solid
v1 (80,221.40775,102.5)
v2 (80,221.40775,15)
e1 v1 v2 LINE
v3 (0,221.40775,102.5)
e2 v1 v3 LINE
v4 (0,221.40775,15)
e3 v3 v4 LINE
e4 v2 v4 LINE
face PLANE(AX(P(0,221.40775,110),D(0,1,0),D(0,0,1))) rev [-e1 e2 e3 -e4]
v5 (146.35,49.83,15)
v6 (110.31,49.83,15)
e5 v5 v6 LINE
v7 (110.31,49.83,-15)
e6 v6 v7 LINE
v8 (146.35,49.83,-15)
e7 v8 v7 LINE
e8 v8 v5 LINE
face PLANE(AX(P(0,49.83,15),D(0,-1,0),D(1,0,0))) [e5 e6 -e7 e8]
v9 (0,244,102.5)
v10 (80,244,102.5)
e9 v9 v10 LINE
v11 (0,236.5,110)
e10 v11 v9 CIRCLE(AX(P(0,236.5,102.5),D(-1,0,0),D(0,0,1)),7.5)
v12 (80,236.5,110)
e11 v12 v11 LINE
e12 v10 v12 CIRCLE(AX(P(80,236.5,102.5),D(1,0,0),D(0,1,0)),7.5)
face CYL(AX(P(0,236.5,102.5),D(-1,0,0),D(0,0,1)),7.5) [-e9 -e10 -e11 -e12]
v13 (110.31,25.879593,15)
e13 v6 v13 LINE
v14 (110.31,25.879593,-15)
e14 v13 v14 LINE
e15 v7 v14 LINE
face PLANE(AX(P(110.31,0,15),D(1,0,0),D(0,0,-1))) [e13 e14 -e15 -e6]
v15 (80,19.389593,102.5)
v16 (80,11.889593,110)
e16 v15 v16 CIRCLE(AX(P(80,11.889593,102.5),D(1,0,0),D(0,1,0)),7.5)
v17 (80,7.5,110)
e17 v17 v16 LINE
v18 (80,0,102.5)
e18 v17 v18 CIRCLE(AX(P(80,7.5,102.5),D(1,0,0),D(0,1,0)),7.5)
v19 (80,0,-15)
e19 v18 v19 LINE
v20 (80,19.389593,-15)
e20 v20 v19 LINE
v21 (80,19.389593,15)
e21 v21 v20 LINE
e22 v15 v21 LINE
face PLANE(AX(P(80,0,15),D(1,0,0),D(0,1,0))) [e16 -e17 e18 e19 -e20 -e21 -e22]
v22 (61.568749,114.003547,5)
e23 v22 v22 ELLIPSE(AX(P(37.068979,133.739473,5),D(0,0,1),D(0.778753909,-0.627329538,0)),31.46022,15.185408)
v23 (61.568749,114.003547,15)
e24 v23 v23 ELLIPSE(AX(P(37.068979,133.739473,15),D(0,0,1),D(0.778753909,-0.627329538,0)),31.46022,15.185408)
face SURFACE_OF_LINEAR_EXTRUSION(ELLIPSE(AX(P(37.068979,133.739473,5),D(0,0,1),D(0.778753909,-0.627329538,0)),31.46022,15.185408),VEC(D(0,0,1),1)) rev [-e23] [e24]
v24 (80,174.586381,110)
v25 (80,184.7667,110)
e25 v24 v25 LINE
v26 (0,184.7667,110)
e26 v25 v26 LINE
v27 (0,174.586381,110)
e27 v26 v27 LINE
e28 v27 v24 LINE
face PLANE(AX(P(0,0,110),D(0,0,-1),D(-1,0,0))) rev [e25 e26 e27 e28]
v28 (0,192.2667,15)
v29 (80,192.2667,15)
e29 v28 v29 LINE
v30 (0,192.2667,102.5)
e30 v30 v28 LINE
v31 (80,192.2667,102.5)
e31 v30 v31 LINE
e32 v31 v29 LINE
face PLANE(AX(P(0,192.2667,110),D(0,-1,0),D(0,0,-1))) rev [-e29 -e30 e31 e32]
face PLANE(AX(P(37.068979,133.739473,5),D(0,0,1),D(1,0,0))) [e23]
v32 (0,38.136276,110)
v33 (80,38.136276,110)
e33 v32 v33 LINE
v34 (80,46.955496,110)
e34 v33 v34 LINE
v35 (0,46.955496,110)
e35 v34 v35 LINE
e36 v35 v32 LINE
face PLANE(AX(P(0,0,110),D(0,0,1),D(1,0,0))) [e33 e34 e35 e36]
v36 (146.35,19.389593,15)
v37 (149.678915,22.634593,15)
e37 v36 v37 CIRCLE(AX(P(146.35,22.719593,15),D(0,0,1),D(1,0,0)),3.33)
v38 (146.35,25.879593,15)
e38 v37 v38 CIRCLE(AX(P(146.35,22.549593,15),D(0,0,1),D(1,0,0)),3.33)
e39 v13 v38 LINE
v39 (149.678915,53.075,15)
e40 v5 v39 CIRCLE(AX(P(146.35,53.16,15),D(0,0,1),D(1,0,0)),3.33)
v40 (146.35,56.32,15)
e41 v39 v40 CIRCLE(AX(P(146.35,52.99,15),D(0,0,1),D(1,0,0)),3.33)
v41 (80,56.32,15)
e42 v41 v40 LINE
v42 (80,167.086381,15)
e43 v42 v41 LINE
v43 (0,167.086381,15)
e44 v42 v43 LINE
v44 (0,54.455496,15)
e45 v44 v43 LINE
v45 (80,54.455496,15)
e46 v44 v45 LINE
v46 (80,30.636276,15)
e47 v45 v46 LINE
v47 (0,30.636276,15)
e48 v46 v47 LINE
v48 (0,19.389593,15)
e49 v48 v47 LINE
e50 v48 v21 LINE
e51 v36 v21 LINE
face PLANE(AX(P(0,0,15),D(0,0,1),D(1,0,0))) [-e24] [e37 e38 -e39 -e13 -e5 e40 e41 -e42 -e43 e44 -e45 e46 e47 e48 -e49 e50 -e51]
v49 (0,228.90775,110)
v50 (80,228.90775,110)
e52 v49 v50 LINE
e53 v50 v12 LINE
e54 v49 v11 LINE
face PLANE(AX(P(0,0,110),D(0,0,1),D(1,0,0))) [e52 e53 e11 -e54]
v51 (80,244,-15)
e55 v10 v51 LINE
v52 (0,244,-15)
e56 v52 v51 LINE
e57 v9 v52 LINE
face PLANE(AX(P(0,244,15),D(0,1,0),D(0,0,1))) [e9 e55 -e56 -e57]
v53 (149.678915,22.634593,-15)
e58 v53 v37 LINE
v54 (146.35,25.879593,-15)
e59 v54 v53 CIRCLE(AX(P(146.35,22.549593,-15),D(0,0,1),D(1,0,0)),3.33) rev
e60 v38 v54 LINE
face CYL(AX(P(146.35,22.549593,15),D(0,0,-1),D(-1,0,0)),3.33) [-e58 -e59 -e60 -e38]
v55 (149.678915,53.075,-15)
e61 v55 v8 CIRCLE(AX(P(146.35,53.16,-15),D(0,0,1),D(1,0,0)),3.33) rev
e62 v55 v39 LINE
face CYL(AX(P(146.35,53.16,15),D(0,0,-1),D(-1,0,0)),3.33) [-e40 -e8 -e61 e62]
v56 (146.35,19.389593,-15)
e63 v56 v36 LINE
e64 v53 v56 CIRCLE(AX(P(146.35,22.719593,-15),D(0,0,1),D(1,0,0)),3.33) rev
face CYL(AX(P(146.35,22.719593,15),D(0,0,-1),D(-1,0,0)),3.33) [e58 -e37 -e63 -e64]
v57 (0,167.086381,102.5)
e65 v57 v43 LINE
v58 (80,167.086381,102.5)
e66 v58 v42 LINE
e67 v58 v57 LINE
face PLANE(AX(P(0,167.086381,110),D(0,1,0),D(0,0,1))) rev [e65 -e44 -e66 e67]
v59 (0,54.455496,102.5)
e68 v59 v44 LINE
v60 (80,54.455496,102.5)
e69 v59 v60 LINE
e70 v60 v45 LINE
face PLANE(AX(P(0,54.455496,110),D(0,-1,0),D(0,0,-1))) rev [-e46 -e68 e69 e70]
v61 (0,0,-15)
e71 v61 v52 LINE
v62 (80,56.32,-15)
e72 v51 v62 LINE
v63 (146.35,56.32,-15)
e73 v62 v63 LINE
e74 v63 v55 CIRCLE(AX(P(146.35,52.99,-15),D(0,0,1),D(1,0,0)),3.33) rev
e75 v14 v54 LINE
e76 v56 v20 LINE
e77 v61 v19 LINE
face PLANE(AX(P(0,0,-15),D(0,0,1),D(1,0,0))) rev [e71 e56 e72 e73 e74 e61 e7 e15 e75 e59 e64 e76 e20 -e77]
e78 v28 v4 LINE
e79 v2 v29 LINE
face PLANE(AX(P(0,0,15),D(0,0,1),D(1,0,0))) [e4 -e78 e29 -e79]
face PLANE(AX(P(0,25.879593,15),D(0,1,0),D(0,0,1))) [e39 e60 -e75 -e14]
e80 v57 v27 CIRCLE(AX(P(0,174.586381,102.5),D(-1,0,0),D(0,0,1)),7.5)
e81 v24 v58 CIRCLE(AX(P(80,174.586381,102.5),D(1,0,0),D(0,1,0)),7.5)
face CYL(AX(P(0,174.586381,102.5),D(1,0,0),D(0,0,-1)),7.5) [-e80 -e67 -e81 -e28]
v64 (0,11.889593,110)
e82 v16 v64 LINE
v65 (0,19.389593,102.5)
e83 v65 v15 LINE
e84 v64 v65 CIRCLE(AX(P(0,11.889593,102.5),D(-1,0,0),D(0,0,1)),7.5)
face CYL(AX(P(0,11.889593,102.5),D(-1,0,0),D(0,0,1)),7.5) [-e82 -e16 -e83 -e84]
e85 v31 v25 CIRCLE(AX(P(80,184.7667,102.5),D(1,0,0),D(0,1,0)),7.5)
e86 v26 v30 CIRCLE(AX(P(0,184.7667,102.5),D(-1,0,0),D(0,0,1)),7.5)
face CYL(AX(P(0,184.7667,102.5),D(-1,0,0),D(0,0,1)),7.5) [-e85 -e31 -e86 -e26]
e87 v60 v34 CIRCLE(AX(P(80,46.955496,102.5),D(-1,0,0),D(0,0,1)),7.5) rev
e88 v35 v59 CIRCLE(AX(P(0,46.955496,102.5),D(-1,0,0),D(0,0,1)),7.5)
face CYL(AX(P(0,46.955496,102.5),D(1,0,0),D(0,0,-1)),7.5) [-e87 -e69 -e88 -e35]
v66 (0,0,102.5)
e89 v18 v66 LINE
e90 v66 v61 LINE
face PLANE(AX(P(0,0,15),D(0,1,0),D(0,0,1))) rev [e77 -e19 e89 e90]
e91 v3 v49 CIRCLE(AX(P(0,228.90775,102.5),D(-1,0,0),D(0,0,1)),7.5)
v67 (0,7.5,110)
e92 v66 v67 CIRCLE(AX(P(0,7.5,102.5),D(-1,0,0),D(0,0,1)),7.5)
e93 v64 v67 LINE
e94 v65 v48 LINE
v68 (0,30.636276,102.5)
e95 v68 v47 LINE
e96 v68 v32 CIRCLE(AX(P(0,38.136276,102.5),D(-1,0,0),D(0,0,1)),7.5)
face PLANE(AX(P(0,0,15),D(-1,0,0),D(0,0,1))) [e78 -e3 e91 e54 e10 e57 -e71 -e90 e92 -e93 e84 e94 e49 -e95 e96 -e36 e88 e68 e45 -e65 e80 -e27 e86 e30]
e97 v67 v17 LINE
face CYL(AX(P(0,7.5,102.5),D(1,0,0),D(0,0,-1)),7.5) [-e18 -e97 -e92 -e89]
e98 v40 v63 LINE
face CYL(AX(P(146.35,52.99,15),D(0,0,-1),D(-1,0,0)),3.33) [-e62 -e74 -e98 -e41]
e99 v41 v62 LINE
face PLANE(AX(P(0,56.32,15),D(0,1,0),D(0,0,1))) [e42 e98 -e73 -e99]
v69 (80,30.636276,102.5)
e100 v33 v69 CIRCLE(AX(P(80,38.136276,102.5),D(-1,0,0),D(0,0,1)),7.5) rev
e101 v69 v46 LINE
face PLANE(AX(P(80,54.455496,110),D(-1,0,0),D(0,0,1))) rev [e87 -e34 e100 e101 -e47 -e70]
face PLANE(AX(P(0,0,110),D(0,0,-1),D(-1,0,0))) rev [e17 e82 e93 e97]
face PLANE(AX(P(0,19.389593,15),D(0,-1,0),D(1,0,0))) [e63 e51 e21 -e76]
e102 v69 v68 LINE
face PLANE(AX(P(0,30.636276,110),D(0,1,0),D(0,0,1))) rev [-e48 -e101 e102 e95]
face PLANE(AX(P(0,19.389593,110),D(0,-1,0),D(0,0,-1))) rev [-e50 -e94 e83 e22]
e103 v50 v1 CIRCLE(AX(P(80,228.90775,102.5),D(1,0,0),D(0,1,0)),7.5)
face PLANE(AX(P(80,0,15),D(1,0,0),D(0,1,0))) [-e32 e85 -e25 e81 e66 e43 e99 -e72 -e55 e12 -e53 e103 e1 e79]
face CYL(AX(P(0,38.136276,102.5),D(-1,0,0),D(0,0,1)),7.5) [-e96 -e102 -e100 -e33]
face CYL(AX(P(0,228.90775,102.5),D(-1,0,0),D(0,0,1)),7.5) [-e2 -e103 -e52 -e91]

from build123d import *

# Parameters (mm, degrees)
BOSS_EXTRUDE2_DEPTH = 15
FILLET1_R           = 3.33
SKETCH3_W           = 80
SKETCH3_H           = 22.592249713
BOSS_EXTRUDE3_DEPTH = 110
SKETCH4_W           = 80
SKETCH4_H           = 25.180318724
SKETCH4_H_2         = 19.389592809
SKETCH4_H_3         = 23.819220414
BOSS_EXTRUDE4_DEPTH = 110
FILLET2_R           = 7.5
SKETCH5_RX          = 31.460220339
SKETCH5_RY          = 15.185408179
CUT_EXTRUDE1_DEPTH  = 10


with BuildPart() as part:
    # Sketch2 → Boss-Extrude2 (new, symmetric)
    with BuildSketch(Plane.XY):
        Polygon((80, 244), (80, 56.32), (80, 0), (0, 0), (0, 244), align=None)
        Polygon((149.68, 56.32), (80, 56.32), (80, 19.389592809), (149.68, 19.389592809), (149.68, 25.879592809), (110.31, 25.879592809), (110.31, 49.83), (149.68, 49.83), align=None)
    extrude(amount=BOSS_EXTRUDE2_DEPTH, both=True)

    # Fillet1
    # the kernel refuses this fillet: 3.33 mm, written as the material it takes off along each edge
    with BuildSketch(Plane(origin=(149.68, 19.389592809, -23.325), x_dir=(-1, 0, 0), z_dir=(0, 0, 1)), Plane(origin=(149.68, 25.879592809, -23.325), x_dir=(0, -1, 0), z_dir=(0, 0, 1)), Plane(origin=(149.68, 49.83, 23.325), x_dir=(0, 1, 0), z_dir=(0, 0, -1)), Plane(origin=(149.68, 56.32, 23.325), x_dir=(-1, 0, 0), z_dir=(0, 0, -1))) as fillet1_piece_1:
        with BuildLine():
            CenterArc((FILLET1_R, -FILLET1_R), FILLET1_R, 90, 90)
            Line((0, -FILLET1_R), (0, 0))
            Line((0, 0), (FILLET1_R, 0))
        make_face()
    extrude(amount=46.65, mode=Mode.SUBTRACT)

    # Sketch3 → Boss-Extrude3 (add)
    with BuildSketch(Plane.XY):
        with Locations((40, 232.703875144)):
            Rectangle(SKETCH3_W, SKETCH3_H)
    extrude(amount=BOSS_EXTRUDE3_DEPTH)

    # Sketch4 → Boss-Extrude4 (add)
    with BuildSketch(Plane.XY):
        with Locations((40, 179.676540861)):
            Rectangle(SKETCH4_W, SKETCH4_H)
        with Locations((40, 9.694796404)):
            Rectangle(SKETCH4_W, SKETCH4_H_2)
        with Locations((40, 42.545886188)):
            Rectangle(SKETCH4_W, SKETCH4_H_3)
    extrude(amount=BOSS_EXTRUDE4_DEPTH)

    # Fillet2
    fillet2_edges = [part.edges().sort_by_distance(p)[0] for p in [
        (40, 167.086381499, 110),
        (40, 192.266700223, 110),
        (40, 0, 110),
        (40, 19.389592809, 110),
        (40, 30.636275981, 110),
        (40, 54.455496395, 110),
        (40, 221.407750287, 110),
        (40, 244, 110),
    ]]
    fillet(fillet2_edges, radius=FILLET2_R)

    # Sketch5 → Cut-Extrude1 (cut)
    with BuildSketch(Plane.XY.offset(15)):
        with Locations(Location((37.068979408, 133.739472919), (0, 0, -38.85337434))):
            Ellipse(SKETCH5_RX, SKETCH5_RY)
    extrude(amount=-CUT_EXTRUDE1_DEPTH, mode=Mode.SUBTRACT)


solid = part.part
